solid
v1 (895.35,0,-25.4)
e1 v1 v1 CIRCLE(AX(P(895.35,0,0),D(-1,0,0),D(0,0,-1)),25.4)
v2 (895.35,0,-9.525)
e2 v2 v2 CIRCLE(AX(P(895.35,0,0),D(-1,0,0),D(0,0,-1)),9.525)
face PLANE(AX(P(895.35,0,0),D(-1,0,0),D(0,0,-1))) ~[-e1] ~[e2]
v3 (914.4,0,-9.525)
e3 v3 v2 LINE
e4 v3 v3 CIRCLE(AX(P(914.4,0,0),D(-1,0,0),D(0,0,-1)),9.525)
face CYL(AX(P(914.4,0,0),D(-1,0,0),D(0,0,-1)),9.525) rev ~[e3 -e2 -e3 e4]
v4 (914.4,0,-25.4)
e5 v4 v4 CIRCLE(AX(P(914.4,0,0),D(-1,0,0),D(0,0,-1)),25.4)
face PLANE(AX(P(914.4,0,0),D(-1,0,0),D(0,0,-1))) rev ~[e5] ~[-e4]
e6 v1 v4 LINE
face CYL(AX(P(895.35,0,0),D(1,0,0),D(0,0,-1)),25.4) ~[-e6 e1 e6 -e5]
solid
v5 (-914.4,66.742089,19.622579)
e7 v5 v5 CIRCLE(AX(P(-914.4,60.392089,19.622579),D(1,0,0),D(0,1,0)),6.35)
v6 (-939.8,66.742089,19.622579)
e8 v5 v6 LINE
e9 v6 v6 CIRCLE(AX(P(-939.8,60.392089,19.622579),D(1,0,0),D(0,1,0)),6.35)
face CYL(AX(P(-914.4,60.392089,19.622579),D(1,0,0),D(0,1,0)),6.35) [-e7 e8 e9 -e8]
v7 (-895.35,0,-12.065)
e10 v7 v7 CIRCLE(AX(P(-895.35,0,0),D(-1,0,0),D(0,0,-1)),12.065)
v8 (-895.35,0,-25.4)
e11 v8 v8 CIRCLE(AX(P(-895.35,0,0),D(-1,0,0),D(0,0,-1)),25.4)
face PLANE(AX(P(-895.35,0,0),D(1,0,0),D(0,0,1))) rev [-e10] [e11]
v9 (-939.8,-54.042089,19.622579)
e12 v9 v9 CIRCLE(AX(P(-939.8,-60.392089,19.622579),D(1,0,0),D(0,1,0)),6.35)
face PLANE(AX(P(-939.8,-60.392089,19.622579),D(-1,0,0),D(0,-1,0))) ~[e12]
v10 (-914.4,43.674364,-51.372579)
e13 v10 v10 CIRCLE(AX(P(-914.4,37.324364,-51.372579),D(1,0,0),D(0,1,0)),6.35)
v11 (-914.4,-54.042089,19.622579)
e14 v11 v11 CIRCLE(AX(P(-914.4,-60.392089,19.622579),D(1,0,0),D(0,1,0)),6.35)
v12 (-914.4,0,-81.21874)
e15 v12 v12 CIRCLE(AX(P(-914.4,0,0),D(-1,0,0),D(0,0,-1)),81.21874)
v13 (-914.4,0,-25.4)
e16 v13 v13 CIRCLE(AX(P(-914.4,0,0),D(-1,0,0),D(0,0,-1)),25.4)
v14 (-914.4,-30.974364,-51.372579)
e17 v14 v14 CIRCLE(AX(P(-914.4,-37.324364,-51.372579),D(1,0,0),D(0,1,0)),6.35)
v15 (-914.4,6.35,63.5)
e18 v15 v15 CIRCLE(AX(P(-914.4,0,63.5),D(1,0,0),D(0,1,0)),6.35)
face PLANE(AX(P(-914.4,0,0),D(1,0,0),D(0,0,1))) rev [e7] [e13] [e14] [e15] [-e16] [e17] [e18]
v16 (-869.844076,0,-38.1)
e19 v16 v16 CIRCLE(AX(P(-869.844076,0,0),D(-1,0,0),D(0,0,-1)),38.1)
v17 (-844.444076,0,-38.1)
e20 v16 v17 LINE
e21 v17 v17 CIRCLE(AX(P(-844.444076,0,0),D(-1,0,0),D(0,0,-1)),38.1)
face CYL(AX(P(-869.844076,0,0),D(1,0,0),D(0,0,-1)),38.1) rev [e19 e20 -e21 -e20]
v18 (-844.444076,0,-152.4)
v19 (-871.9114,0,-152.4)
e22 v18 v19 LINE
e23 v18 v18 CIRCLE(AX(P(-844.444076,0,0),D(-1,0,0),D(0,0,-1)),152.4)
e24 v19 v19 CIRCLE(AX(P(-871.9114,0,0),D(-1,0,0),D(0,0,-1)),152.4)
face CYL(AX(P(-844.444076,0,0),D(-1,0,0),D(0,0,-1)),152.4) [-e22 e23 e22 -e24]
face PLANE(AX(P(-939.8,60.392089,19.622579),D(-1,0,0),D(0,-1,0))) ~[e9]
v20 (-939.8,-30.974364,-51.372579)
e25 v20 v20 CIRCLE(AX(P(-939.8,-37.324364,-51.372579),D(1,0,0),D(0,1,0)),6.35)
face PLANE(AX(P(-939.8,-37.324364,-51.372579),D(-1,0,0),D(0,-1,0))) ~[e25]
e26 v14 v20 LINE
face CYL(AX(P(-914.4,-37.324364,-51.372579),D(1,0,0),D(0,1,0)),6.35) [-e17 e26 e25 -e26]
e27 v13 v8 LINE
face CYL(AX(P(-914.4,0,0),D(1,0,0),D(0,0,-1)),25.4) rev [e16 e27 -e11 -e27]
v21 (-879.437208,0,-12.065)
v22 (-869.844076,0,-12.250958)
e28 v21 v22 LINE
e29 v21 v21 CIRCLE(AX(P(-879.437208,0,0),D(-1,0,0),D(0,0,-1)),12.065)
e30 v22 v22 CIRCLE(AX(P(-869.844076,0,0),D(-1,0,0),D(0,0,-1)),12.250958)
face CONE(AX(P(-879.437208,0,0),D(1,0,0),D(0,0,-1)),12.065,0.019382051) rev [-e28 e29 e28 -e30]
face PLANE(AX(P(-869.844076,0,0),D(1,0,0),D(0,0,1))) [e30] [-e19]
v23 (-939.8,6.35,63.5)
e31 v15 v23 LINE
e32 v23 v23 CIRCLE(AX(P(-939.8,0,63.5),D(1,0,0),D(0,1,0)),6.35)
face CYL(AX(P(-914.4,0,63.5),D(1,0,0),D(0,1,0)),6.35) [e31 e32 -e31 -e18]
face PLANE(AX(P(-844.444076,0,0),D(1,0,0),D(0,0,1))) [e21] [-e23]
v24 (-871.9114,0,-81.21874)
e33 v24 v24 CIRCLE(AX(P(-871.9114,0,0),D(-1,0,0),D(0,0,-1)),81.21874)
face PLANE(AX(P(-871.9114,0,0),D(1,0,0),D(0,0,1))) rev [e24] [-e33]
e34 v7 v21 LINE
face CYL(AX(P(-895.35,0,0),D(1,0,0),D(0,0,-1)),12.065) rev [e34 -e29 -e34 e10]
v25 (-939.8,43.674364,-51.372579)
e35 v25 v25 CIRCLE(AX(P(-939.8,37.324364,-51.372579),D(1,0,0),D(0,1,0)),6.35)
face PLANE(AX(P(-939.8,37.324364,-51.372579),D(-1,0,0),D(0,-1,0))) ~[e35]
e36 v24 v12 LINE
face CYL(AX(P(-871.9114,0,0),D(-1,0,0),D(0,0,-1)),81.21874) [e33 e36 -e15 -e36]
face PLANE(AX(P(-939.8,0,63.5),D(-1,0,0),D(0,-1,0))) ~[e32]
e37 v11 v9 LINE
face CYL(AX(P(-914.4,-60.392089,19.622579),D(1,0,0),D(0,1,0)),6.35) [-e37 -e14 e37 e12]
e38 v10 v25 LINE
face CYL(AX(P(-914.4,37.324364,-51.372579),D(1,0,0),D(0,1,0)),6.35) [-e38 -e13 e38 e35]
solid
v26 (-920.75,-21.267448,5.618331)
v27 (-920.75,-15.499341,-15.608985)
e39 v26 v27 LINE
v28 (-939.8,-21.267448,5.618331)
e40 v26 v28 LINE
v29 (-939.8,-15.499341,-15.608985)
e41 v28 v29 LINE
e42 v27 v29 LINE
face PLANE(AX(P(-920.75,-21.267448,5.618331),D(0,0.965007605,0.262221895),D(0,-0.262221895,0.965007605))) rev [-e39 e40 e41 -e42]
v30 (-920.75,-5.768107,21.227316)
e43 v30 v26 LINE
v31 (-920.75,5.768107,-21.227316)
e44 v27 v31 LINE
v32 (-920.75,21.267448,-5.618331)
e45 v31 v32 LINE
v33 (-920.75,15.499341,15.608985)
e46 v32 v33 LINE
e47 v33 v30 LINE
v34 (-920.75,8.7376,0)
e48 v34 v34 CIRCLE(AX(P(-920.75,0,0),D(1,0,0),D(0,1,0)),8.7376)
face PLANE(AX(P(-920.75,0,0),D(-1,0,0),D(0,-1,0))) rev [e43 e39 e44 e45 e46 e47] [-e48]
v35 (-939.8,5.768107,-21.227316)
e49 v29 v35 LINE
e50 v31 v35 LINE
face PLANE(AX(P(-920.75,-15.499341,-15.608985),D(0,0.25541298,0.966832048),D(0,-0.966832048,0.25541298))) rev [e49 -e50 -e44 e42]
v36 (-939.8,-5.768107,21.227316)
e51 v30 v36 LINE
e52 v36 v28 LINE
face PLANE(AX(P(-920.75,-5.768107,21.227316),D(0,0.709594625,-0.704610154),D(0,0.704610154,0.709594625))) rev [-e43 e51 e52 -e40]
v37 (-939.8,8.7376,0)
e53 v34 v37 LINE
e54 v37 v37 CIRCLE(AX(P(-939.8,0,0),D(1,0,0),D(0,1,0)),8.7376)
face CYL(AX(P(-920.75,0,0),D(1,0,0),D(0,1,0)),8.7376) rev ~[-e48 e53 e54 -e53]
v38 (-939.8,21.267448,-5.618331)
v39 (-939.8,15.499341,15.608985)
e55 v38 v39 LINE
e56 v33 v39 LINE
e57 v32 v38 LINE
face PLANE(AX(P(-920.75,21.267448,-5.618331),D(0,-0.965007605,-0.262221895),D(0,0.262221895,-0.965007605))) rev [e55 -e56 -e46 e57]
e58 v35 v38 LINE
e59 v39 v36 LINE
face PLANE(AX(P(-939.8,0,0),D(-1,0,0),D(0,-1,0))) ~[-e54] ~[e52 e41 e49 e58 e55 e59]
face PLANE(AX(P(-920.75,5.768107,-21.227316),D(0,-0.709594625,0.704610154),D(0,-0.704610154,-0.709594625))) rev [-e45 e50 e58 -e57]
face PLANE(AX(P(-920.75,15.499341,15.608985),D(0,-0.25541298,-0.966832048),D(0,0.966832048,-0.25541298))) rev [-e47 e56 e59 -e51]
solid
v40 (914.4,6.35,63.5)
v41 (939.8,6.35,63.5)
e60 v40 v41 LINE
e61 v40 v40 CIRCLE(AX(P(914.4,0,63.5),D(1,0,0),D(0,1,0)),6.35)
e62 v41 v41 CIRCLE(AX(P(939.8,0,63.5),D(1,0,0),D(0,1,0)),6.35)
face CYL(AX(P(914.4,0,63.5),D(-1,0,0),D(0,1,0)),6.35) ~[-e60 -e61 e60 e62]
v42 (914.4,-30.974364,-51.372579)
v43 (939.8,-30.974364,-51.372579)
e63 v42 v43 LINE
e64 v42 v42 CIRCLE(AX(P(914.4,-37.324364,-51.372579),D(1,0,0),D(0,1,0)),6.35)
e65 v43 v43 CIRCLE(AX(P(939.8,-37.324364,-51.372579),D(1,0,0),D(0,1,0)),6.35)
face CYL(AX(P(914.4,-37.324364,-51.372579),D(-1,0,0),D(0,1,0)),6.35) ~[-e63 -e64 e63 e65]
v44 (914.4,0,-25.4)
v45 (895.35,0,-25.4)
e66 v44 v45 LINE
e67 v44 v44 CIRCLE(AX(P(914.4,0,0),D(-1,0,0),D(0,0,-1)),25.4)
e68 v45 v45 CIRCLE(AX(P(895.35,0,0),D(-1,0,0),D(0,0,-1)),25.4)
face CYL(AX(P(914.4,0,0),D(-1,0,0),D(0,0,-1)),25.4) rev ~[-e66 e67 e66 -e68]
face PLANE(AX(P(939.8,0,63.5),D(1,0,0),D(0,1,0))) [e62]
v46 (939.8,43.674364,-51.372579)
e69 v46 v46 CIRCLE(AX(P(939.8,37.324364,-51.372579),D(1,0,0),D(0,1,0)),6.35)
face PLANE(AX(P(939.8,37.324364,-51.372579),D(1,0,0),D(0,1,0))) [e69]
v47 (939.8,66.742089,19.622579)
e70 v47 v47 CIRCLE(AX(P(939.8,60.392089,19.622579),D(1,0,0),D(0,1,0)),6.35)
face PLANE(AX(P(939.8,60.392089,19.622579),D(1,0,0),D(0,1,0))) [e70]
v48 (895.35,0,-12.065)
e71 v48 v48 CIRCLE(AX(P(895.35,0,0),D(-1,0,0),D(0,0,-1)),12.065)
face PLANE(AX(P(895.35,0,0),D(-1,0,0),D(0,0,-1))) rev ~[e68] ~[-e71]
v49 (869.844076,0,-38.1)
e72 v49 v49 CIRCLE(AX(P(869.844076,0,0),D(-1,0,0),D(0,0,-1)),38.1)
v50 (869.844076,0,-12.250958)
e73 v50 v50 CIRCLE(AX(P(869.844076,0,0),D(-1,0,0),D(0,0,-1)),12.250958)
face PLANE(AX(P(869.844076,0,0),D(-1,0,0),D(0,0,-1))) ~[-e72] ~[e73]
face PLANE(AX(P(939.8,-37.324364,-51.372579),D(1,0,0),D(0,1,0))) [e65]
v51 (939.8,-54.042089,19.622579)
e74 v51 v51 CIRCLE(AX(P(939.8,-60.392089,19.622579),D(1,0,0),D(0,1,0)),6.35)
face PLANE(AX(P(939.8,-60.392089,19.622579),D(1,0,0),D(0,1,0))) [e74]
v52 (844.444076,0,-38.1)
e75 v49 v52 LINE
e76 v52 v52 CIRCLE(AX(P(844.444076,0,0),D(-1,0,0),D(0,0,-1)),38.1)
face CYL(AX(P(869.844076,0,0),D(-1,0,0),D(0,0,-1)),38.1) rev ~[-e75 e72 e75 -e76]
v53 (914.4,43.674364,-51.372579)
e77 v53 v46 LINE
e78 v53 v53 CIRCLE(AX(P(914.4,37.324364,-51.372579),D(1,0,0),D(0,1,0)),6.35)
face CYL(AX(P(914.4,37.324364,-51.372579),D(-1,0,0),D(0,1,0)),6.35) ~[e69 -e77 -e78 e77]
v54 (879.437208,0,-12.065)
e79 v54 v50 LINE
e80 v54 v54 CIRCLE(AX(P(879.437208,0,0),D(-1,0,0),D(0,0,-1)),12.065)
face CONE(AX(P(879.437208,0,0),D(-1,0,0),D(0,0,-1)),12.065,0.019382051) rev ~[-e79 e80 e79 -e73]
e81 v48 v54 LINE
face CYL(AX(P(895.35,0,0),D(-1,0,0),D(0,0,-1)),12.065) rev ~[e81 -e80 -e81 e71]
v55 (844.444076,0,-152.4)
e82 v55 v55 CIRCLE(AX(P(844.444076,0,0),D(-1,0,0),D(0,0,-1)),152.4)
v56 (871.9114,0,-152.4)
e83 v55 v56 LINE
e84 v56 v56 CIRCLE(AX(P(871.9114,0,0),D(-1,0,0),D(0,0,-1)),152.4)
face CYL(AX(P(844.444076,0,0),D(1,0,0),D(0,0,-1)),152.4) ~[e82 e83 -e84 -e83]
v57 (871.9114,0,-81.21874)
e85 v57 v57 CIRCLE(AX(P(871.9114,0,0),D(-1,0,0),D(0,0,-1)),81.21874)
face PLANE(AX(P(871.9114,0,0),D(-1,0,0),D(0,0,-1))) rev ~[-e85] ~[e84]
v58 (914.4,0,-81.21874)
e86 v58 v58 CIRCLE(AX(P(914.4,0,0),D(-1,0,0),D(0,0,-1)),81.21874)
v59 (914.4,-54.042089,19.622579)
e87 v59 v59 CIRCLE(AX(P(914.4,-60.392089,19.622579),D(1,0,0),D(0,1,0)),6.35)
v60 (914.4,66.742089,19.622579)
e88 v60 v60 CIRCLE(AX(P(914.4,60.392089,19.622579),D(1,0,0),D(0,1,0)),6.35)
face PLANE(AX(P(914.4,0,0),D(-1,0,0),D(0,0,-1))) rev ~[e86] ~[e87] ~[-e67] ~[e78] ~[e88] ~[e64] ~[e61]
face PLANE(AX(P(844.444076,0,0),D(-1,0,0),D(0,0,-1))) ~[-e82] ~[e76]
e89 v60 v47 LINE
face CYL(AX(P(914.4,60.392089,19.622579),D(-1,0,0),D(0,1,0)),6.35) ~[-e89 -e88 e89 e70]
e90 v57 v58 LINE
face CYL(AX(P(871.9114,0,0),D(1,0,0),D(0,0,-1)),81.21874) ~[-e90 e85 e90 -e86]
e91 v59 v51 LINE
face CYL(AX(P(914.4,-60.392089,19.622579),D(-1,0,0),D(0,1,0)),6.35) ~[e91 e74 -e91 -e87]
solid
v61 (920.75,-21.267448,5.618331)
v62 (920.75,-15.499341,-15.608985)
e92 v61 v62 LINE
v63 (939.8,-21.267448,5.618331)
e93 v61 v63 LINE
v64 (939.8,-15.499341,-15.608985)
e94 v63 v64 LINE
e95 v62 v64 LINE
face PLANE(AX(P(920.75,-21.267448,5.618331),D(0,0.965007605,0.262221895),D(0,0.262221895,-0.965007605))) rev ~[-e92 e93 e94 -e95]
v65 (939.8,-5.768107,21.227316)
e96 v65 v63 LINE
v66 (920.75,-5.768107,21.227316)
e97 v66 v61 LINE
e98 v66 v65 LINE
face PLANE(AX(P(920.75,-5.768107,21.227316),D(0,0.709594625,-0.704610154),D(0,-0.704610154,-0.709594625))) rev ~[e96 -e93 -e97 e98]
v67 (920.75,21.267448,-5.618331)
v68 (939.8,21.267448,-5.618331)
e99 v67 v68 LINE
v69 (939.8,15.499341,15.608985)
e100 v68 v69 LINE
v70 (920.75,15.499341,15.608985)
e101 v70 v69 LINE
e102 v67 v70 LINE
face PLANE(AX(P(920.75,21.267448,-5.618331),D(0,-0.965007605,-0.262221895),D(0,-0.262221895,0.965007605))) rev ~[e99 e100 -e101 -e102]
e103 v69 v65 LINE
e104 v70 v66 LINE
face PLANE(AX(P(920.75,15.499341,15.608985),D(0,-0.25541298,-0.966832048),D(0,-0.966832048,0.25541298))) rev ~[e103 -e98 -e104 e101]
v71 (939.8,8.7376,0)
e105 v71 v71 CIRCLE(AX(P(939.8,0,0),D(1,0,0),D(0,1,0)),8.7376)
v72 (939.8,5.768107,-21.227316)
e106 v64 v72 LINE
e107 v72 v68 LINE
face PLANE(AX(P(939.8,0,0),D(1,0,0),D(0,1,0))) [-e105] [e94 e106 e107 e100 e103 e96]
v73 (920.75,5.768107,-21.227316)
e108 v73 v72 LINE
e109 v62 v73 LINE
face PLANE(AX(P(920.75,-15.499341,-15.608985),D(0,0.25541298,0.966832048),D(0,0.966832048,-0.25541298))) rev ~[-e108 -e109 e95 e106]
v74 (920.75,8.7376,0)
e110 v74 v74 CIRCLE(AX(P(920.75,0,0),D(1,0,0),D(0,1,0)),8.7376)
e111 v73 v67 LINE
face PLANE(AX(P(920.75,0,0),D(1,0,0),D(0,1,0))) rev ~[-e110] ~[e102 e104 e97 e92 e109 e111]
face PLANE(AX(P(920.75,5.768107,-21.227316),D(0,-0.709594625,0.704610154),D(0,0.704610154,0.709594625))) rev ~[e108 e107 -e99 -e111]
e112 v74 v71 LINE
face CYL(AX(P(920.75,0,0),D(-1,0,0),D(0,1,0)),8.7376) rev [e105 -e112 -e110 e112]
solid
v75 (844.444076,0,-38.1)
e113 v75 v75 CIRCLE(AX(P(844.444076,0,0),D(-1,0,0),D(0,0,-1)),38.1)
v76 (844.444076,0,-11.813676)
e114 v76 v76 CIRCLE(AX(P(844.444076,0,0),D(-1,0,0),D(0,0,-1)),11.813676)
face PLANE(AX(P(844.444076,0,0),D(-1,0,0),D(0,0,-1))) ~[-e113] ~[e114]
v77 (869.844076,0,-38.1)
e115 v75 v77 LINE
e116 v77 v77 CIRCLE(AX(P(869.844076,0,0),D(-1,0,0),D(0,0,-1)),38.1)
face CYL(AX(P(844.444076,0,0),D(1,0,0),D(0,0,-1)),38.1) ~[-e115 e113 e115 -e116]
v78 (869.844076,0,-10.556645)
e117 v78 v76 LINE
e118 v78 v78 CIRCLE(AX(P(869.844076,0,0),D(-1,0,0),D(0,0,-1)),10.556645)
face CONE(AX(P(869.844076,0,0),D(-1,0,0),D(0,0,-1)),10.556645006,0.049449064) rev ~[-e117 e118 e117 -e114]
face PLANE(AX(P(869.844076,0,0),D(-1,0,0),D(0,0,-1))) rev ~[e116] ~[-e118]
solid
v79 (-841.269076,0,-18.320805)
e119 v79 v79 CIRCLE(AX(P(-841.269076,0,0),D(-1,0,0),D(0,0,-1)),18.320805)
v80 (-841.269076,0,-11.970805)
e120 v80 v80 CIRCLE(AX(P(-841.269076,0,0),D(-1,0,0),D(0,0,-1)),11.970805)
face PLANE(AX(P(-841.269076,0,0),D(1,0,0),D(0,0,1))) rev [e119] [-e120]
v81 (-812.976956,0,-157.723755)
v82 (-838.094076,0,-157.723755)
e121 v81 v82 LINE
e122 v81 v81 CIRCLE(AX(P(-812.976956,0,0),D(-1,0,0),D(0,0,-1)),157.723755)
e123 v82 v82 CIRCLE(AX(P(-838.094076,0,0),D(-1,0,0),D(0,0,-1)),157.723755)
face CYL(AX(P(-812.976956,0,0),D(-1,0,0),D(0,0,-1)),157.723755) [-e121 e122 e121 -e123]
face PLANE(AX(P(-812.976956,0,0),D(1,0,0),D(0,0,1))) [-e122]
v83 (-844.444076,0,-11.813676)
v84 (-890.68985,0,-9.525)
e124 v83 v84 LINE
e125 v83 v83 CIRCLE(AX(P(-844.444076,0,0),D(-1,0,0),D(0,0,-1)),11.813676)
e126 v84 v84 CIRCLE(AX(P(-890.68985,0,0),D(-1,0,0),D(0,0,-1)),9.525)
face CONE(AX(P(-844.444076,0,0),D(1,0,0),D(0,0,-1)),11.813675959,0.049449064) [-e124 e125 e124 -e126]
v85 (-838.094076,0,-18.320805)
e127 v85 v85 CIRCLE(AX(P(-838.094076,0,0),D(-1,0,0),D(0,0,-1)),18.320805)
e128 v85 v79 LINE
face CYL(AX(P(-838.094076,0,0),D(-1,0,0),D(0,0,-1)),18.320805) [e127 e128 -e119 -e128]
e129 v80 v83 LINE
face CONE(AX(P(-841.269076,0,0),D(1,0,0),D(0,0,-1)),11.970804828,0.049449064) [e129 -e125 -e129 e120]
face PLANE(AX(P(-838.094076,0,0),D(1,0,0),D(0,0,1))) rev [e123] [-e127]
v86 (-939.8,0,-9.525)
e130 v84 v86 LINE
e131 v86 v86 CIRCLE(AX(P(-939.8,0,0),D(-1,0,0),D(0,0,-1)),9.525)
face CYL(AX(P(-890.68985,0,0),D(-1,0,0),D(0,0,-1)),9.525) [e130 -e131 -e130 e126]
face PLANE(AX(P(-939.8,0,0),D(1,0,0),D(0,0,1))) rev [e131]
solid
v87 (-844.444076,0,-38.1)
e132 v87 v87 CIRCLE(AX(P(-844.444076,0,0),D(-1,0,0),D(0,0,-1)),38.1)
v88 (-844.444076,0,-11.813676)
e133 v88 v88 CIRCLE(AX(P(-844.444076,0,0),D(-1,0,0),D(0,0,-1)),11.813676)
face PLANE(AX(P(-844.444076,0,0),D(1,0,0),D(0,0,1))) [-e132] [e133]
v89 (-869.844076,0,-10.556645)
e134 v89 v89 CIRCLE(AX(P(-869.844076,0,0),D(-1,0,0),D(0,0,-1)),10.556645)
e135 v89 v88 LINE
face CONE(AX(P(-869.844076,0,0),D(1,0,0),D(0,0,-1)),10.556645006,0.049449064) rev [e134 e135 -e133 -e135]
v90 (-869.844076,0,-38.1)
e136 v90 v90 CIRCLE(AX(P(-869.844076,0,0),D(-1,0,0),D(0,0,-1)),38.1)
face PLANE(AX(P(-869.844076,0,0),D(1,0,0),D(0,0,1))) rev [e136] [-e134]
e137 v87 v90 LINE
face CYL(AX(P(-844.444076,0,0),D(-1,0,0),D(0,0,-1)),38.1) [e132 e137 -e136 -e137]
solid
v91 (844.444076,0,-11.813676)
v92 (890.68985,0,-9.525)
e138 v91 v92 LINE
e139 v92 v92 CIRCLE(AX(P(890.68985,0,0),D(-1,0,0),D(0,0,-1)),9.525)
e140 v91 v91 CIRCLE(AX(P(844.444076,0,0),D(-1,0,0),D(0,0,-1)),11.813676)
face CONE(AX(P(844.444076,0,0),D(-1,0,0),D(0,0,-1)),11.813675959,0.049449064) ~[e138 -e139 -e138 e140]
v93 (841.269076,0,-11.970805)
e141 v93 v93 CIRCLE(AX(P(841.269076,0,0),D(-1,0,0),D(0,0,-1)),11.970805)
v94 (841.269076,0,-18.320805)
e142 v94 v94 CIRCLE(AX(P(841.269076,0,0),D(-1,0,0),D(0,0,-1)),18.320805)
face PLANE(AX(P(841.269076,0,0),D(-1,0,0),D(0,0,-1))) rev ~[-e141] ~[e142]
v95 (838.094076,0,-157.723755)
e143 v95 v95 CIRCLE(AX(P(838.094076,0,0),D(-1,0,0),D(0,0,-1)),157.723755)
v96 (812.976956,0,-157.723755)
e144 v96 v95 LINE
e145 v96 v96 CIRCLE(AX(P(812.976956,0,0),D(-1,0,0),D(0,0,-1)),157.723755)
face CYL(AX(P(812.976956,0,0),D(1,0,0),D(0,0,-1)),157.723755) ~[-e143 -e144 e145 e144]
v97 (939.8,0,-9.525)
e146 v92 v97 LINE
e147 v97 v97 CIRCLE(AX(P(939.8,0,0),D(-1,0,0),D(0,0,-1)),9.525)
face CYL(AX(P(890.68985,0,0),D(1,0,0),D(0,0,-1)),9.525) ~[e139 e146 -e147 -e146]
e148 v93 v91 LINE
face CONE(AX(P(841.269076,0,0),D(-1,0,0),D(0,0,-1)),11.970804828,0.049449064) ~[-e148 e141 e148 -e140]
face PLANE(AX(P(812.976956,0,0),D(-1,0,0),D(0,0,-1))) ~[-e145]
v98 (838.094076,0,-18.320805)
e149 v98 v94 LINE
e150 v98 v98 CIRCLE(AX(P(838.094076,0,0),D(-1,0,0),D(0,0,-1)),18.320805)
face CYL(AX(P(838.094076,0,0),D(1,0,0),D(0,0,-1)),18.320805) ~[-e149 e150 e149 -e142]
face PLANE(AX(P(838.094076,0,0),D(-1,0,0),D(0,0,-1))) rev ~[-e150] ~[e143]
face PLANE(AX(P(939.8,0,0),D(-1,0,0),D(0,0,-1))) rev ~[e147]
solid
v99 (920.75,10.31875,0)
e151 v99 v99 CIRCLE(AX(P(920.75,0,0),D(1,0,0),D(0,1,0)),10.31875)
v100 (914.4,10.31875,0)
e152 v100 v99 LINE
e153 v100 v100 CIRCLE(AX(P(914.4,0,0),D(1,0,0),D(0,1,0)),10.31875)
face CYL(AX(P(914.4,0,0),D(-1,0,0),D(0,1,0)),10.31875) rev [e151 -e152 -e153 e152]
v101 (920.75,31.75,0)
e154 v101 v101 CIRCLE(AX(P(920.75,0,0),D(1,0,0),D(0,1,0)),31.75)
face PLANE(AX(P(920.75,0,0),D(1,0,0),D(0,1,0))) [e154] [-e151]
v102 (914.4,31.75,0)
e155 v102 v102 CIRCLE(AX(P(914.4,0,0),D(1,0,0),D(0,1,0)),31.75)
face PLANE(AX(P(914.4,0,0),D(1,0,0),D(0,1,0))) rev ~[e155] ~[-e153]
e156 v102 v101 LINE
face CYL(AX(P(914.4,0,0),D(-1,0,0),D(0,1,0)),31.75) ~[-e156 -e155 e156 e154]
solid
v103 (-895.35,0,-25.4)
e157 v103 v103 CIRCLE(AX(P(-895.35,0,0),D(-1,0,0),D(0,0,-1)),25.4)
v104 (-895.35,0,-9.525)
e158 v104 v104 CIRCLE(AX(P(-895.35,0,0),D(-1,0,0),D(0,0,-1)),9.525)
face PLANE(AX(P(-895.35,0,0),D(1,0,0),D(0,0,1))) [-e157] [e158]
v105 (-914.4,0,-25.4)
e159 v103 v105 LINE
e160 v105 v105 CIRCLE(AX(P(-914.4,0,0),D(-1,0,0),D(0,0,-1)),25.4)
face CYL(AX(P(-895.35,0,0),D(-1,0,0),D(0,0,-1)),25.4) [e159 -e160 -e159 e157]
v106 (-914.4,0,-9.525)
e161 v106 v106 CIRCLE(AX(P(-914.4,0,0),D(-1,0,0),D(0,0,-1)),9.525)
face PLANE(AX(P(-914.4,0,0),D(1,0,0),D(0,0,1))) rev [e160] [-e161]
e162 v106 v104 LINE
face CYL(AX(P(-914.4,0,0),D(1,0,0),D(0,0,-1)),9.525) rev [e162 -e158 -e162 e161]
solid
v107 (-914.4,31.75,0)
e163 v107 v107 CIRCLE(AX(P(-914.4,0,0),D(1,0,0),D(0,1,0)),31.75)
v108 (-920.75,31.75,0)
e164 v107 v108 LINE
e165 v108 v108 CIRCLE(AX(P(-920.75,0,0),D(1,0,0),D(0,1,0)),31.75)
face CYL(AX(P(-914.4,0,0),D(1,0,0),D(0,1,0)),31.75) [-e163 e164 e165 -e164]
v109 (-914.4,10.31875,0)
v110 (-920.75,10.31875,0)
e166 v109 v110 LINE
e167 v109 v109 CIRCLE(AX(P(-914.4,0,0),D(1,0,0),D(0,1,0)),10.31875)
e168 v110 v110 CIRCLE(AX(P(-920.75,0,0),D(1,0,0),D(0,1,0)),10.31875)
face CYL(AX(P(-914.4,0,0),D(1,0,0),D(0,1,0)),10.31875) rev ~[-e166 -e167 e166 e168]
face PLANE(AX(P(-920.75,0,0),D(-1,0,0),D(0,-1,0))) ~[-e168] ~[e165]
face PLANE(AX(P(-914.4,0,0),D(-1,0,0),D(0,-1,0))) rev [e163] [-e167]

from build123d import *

# Parameters (mm, degrees)
F6_R      = 6.35
F7_DEPTH  = 25.4
F8_R      = 31.75
F8_R_2    = 10.31875
F9_DEPTH  = 6.35
F10_R     = 8.7376
F11_DEPTH = 19.05


# Not quite as in the source:
# - a feature of the source that left no trace in its solid (it failed there, or was rolled back) is left out


with BuildPart() as f2:
    # F1 (on Front) → F2 (revolve)
    with BuildSketch(Plane.XZ):
        Polygon((895.35, -9.525), (914.4, -9.525), (939.8, -9.525), (939.8, 0), (812.9769563675, 0), (812.9769563675, -157.7237546444), (838.0940758705, -157.7237546444), (838.0940758705, -18.3208048281), (841.2690758705, -18.3208048281), (841.2690758705, -11.9708048281), (844.4440758705, -11.8136759589), (869.8440758705, -10.5566450056), (890.6898498535, -9.525), align=None)
    revolve(axis=Axis((876.3884781837, 0, 0), (-1, 0, 0)))


with BuildPart() as f3:
    # F1 (on Front) → F3 (revolve)
    with BuildSketch(Plane.XZ):
        Polygon((914.4, -81.2187399507), (914.4, -25.4), (895.35, -25.4), (895.35, -12.065), (879.4372081757, -12.065), (869.8440758705, -12.2509578667), (869.8440758705, -38.1), (844.4440758705, -38.1), (844.4440758705, -152.4), (871.9114001578, -152.4), (871.9114001578, -81.2187399507), align=None)
    revolve(axis=Axis((876.3884781837, 0, 0), (-1, 0, 0)))

    # F6 (on face) → F7 (join)
    with BuildSketch(Plane.YZ.offset(914.4)):
        with Locations((0, 63.5)):
            Circle(F6_R)
        with Locations((-60.3920887847, 19.6225791428)):
            Circle(F6_R)
        with Locations((-37.3243635206, -51.3725791428)):
            Circle(F6_R)
        with Locations((37.3243635206, -51.3725791428)):
            Circle(F6_R)
        with Locations((60.3920887847, 19.6225791428)):
            Circle(F6_R)
    extrude(amount=F7_DEPTH)


with BuildPart() as f4:
    # F1 (on Front) → F4 (revolve)
    with BuildSketch(Plane.XZ):
        Polygon((869.8440758705, -38.1), (869.8440758705, -12.2509578667), (869.8440758705, -10.5566450056), (844.4440758705, -11.8136759589), (844.4440758705, -38.1), align=None)
    revolve(axis=Axis((876.3884781837, 0, 0), (-1, 0, 0)))


with BuildPart() as f5:
    # F1 (on Front) → F5 (revolve)
    with BuildSketch(Plane.XZ):
        Polygon((895.35, -25.4), (914.4, -25.4), (914.4, -9.525), (895.35, -9.525), (895.35, -12.065), align=None)
    revolve(axis=Axis((876.3884781837, 0, 0), (-1, 0, 0)))


with BuildPart() as f9:
    # F8 (on face) → F9 (new body)
    with BuildSketch(Plane.YZ.offset(914.4)):
        Circle(F8_R)
        Circle(F8_R_2, mode=Mode.SUBTRACT)
    extrude(amount=F9_DEPTH)


with BuildPart() as f11:
    # F10 (on face) → F11 (new body)
    with BuildSketch(Plane.YZ.offset(920.75)):
        Polygon((15.4993414366, 15.6089850737), (-5.7681068828, 21.2273159629), (-21.2674483194, 5.6183308892), (-15.4993414366, -15.6089850737), (5.7681068828, -21.2273159629), (21.2674483194, -5.6183308892), align=None)
        Circle(F10_R, mode=Mode.SUBTRACT)
    extrude(amount=F11_DEPTH)


with BuildPart() as f12_1:
    # F12: instance of F2
    add(f2.part.mirror(Plane.YZ))


with BuildPart() as f12_2:
    # F12: instance of F3
    add(f3.part.mirror(Plane.YZ))


with BuildPart() as f12_3:
    # F12: instance of F4
    add(f4.part.mirror(Plane.YZ))


with BuildPart() as f12_4:
    # F12: instance of F5
    add(f5.part.mirror(Plane.YZ))


with BuildPart() as f12_5:
    # F12: instance of F9
    add(f9.part.mirror(Plane.YZ))


with BuildPart() as f12_6:
    # F12: instance of F11
    add(f11.part.mirror(Plane.YZ))


solid = Compound([f2.part, f3.part, f4.part, f5.part, f9.part, f11.part, f12_1.part, f12_2.part, f12_3.part, f12_4.part, f12_5.part, f12_6.part])
